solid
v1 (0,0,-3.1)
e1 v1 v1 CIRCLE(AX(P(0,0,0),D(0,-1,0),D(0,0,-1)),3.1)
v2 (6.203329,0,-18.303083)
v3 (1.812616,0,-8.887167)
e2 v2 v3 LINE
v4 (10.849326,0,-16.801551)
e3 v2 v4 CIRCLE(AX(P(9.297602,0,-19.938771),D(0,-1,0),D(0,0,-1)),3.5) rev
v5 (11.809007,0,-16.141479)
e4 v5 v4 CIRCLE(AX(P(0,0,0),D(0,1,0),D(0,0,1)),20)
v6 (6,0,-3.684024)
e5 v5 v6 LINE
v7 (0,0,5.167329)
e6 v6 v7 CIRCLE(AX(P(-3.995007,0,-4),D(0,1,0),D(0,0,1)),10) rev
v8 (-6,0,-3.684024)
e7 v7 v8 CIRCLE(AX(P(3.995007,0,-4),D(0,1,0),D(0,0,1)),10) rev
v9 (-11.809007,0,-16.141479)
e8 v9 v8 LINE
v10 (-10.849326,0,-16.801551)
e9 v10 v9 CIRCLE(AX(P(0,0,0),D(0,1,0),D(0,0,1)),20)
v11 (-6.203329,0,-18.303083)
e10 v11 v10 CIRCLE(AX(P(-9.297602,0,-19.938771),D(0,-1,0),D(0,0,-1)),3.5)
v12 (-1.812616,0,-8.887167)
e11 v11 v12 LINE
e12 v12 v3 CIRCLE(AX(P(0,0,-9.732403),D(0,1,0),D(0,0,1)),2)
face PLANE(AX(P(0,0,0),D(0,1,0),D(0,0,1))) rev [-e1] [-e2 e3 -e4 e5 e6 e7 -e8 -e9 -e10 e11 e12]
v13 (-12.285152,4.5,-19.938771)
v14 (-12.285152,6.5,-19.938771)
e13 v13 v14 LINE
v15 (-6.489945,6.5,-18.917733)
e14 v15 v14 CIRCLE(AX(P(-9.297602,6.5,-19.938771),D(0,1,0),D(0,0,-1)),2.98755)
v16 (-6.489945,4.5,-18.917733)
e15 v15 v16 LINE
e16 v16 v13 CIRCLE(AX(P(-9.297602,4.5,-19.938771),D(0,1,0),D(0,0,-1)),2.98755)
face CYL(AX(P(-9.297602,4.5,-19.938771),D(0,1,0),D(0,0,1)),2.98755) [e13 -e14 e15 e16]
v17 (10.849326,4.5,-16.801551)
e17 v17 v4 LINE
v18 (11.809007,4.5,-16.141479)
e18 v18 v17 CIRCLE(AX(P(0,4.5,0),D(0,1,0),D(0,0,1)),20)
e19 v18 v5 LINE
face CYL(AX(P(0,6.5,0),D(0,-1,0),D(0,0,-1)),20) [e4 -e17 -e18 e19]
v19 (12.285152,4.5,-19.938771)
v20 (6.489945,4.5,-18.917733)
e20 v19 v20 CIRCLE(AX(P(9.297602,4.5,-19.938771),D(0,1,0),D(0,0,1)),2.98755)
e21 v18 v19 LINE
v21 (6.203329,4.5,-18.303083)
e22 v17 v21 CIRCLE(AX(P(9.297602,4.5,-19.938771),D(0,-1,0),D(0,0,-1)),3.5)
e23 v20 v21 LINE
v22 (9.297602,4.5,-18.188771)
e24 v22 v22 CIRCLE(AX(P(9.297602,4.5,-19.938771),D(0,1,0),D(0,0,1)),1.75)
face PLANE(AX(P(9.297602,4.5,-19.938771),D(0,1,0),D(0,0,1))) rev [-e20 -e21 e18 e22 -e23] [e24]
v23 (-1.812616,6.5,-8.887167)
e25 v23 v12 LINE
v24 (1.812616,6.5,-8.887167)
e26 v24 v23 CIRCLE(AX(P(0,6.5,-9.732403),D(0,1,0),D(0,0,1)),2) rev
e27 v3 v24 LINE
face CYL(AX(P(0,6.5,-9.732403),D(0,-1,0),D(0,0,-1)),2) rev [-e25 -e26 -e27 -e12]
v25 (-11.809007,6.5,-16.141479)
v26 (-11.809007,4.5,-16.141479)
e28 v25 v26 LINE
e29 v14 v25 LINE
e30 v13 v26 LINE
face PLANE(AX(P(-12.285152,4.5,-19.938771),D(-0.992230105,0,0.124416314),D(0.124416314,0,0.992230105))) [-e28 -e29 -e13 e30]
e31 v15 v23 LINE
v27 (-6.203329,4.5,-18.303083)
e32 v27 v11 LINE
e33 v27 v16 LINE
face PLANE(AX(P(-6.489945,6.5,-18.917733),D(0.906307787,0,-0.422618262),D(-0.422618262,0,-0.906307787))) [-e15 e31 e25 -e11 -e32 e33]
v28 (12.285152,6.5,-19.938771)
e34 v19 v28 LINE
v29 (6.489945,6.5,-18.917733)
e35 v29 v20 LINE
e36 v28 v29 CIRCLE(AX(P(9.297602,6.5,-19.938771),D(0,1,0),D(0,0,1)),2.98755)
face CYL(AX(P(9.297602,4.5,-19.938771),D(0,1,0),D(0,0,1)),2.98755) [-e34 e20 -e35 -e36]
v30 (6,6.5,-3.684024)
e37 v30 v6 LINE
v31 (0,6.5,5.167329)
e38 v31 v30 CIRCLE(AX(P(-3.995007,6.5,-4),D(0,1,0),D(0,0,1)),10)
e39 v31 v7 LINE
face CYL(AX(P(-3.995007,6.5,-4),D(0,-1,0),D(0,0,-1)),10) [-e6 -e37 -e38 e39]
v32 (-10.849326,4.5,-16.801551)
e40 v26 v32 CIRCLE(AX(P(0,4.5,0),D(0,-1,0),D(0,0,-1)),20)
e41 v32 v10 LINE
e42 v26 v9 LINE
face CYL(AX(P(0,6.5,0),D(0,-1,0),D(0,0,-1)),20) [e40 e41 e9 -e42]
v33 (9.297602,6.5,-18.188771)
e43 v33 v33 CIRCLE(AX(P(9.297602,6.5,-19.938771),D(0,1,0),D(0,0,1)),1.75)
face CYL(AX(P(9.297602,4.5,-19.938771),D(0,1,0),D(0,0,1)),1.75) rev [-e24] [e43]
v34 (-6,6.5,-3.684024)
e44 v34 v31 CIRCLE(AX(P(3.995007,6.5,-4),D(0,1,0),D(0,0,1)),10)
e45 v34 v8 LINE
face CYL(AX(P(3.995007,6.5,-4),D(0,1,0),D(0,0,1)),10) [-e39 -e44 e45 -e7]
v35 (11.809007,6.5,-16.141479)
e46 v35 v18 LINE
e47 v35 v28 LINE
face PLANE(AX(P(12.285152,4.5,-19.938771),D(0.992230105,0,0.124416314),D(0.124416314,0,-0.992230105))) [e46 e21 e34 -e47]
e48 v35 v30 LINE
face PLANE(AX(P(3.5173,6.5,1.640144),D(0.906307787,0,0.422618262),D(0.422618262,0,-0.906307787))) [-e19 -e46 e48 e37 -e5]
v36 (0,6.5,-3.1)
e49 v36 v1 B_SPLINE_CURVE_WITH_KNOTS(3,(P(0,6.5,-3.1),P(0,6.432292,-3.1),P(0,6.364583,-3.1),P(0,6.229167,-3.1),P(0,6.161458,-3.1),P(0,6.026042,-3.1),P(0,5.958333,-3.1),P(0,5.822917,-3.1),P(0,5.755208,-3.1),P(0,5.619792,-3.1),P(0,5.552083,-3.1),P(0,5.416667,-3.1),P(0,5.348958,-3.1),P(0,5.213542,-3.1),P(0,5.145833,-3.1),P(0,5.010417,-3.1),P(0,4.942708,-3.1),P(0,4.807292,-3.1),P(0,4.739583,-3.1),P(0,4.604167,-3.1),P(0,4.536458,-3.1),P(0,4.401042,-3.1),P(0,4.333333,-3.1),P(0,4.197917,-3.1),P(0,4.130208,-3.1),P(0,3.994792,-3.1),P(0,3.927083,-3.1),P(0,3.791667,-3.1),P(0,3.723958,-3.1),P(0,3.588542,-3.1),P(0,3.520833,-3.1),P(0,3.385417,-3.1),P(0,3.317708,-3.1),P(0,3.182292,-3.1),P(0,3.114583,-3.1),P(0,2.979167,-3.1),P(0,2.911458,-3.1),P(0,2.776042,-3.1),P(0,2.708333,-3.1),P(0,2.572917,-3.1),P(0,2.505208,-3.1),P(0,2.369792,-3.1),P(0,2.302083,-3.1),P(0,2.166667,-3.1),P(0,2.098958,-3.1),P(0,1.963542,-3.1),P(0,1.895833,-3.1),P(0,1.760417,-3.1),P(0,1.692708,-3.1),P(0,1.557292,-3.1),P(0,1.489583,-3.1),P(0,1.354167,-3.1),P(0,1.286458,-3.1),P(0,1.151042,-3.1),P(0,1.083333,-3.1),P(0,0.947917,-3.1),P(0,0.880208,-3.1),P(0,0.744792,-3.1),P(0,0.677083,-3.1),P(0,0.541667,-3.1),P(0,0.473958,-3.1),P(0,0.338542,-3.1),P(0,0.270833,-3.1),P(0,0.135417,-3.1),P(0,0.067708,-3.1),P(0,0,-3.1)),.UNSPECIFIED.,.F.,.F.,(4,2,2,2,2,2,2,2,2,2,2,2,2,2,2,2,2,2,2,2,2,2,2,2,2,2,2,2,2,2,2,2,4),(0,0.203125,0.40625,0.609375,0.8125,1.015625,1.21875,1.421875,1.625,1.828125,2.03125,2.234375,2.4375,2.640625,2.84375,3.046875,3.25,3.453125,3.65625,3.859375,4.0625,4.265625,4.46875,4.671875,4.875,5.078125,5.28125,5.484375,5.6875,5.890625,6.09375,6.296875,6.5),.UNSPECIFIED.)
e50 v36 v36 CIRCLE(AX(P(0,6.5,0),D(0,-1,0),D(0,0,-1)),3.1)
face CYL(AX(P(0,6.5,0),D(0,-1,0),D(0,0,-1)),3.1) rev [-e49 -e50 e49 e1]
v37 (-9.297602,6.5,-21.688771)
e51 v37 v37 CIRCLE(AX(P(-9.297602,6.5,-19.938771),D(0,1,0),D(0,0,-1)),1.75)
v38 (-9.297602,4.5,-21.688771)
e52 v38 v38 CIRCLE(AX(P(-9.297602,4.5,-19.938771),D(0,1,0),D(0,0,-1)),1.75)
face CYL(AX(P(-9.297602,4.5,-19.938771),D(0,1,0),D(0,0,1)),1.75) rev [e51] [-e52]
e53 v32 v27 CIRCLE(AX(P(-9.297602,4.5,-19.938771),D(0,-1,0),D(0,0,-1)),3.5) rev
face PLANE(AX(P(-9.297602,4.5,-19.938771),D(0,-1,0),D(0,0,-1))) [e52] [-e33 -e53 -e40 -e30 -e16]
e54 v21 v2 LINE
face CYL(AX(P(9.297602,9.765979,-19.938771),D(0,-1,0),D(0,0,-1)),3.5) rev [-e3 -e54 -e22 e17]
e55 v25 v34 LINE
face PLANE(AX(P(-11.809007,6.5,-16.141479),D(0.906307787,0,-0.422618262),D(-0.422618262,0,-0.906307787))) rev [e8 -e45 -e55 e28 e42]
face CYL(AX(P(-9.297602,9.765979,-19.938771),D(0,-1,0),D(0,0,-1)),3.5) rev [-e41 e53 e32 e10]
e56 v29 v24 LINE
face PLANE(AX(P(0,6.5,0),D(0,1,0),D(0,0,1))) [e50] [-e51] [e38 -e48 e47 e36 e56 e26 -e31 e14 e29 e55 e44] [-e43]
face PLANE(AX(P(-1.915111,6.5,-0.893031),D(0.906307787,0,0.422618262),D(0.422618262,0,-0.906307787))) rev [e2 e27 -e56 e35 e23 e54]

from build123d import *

# Parameters (mm, degrees)
BOSS_EXTRUDE1_DEPTH = 6.5
SKETCH2_R           = 3.1
CUT_EXTRUDE1_DEPTH  = 24.228931445
SKETCH3_R           = 1.75
BOSS_EXTRUDE2_DEPTH = 2
CUT_EXTRUDE2_DEPTH  = 4.5
FILLET1_R           = 10
FILLET2_R           = 2


with BuildPart() as part:
    # Sketch1 → Boss-Extrude1 (new body)
    with BuildSketch(Plane(origin=(0, 0, 0), x_dir=(1, 0, 0), z_dir=(0, 1, 0))):
        with BuildLine():
            Line((-6.489945331, 18.917732676), (0, 5))
            Line((0, 5), (6.489945331, 18.917732676))
            ThreePointArc((6.489945331, 18.917732676), (9.254177969, 17.730205586), (11.809007007, 16.141479285))
            Line((11.809007007, 16.141479285), (6, 3.684023558))
            Line((6, 3.684023558), (6, -6))
            Line((6, -6), (-6, -6))
            Line((-6, -6), (-6, 3.684023558))
            Line((-6, 3.684023558), (-11.809007007, 16.141479285))
            ThreePointArc((-11.809007007, 16.141479285), (-9.254177969, 17.730205586), (-6.489945331, 18.917732676))
        make_face()
    extrude(amount=BOSS_EXTRUDE1_DEPTH)

    # Sketch2 → Cut-Extrude1 (cut, through all)
    with BuildSketch(Plane.XZ):
        with Locations(Location((0, 0, 0), (0, 0, 270))):
            Circle(SKETCH2_R)
    extrude(amount=-CUT_EXTRUDE1_DEPTH, mode=Mode.SUBTRACT)

    # Sketch3 → Boss-Extrude2 (add)
    # profile 1 of 2: a face of its own
    with BuildSketch(Plane(origin=(0, 6.5, 0), x_dir=(1, 0, 0), z_dir=(0, 1, 0))):
        with BuildLine():
            Line((12.285151677, 19.938771315), (11.809007007, 16.141479285))
            Line((11.809007007, 16.141479285), (8.152317162, 17.179463846))
            ThreePointArc((8.152317162, 17.179463846), (7.638707607, 22.42342918), (12.285151677, 19.938771315))
        make_face()
        with Locations(Location((9.297601758, 19.938771315, 0), (0, 0, 270))):
            Circle(SKETCH3_R, mode=Mode.SUBTRACT)
    # profile 2 of 2: a face of its own
    with BuildSketch(Plane(origin=(0, 6.5, 0), x_dir=(1, 0, 0), z_dir=(0, 1, 0))):
        with BuildLine():
            Line((-11.809007007, 16.141479285), (-8.152317162, 17.179463846))
            ThreePointArc((-8.152317162, 17.179463846), (-7.638707607, 22.42342918), (-12.285151677, 19.938771315))
            Line((-12.285151677, 19.938771315), (-11.809007007, 16.141479285))
        make_face()
        with Locations(Location((-9.297601758, 19.938771315, 0), (0, 0, 90))):
            Circle(SKETCH3_R, mode=Mode.SUBTRACT)
    extrude(amount=-BOSS_EXTRUDE2_DEPTH)

    # Sketch5 → Cut-Extrude2 (cut)
    with BuildSketch(Plane.XZ):
        with BuildLine():
            ThreePointArc((10.849326324, -16.801551069), (8.221259471, -16.608382857), (6.203329268, -18.303082545))
            Line((6.203329268, -18.303082545), (6.489945331, -18.917732676))
            ThreePointArc((6.489945331, -18.917732676), (8.733964823, -17.992161028), (10.849326324, -16.801551069))
        make_face()
        with BuildLine():
            Line((6.489945331, -18.917732676), (6.203329268, -18.303082545))
            ThreePointArc((6.203329268, -18.303082545), (8.454973049, -23.335825459), (12.797601758, -19.938771315))
            ThreePointArc((12.797601758, -19.938771315), (12.270902616, -18.092293043), (10.849326324, -16.801551069))
            ThreePointArc((10.849326324, -16.801551069), (8.733964823, -17.992161028), (6.489945331, -18.917732676))
        make_face()
        with BuildLine():
            ThreePointArc((-10.849326324, -16.801551069), (-11.144080031, -22.912072172), (-5.797601758, -19.938771315))
            ThreePointArc((-5.797601758, -19.938771315), (-5.900547614, -19.096142606), (-6.203329268, -18.303082545))
            Line((-6.203329268, -18.303082545), (-6.489945331, -18.917732676))
            ThreePointArc((-6.489945331, -18.917732676), (-8.733964823, -17.992161028), (-10.849326324, -16.801551069))
        make_face()
        with BuildLine():
            Line((-6.489945331, -18.917732676), (-6.203329268, -18.303082545))
            ThreePointArc((-6.203329268, -18.303082545), (-8.221259471, -16.608382857), (-10.849326324, -16.801551069))
            ThreePointArc((-10.849326324, -16.801551069), (-8.733964823, -17.992161028), (-6.489945331, -18.917732676))
        make_face()
    extrude(amount=-CUT_EXTRUDE2_DEPTH, mode=Mode.SUBTRACT)

    # Fillet1
    # the kernel refuses this fillet: 10 mm, written as the material it takes off along each edge
    with BuildSketch(Plane(origin=(6, -24.987516744, 6), x_dir=(-1, 0, 0), z_dir=(0, 1, 0))) as fillet1_piece_1:
        with BuildLine():
            CenterArc((9.995006698, -10), FILLET1_R, 90, 88.189286954)
            Line((0, -9.684023558), (-0.199900134, -9.677704029))
            ThreePointArc((-0.199900134, -9.677704029), (-0.2, -4.842011779), (-0.2, 0))
            Line((-0.2, 0), (0, 0.2))
            Line((0, 0.2), (9.995006698, 0.2))
            Line((9.995006698, 0.2), (9.995006698, 0))
        make_face()
    extrude(amount=56.475033489, mode=Mode.SUBTRACT)
    with BuildSketch(Plane(origin=(-6, -24.987516744, 6), x_dir=(0, 0, -1), z_dir=(0, 1, 0))) as fillet1_piece_2:
        with BuildLine():
            CenterArc((10, -9.995006698), FILLET1_R, 91.810713046, 88.189286954)
            Line((0, -9.995006698), (-0.2, -9.995006698))
            Line((-0.2, -9.995006698), (-0.2, 0))
            Line((-0.2, 0), (0, 0.2))
            ThreePointArc((0, 0.2), (4.842011779, 0.2), (9.677704029, 0.199900134))
            Line((9.677704029, 0.199900134), (9.684023558, 0))
        make_face()
    extrude(amount=56.475033489, mode=Mode.SUBTRACT)

    # Fillet2
    fillet2_edges = [part.edges().sort_by_distance(p)[0] for p in [
        (0, 3.25, -5),
    ]]
    fillet(fillet2_edges, radius=FILLET2_R)


solid = part.part
